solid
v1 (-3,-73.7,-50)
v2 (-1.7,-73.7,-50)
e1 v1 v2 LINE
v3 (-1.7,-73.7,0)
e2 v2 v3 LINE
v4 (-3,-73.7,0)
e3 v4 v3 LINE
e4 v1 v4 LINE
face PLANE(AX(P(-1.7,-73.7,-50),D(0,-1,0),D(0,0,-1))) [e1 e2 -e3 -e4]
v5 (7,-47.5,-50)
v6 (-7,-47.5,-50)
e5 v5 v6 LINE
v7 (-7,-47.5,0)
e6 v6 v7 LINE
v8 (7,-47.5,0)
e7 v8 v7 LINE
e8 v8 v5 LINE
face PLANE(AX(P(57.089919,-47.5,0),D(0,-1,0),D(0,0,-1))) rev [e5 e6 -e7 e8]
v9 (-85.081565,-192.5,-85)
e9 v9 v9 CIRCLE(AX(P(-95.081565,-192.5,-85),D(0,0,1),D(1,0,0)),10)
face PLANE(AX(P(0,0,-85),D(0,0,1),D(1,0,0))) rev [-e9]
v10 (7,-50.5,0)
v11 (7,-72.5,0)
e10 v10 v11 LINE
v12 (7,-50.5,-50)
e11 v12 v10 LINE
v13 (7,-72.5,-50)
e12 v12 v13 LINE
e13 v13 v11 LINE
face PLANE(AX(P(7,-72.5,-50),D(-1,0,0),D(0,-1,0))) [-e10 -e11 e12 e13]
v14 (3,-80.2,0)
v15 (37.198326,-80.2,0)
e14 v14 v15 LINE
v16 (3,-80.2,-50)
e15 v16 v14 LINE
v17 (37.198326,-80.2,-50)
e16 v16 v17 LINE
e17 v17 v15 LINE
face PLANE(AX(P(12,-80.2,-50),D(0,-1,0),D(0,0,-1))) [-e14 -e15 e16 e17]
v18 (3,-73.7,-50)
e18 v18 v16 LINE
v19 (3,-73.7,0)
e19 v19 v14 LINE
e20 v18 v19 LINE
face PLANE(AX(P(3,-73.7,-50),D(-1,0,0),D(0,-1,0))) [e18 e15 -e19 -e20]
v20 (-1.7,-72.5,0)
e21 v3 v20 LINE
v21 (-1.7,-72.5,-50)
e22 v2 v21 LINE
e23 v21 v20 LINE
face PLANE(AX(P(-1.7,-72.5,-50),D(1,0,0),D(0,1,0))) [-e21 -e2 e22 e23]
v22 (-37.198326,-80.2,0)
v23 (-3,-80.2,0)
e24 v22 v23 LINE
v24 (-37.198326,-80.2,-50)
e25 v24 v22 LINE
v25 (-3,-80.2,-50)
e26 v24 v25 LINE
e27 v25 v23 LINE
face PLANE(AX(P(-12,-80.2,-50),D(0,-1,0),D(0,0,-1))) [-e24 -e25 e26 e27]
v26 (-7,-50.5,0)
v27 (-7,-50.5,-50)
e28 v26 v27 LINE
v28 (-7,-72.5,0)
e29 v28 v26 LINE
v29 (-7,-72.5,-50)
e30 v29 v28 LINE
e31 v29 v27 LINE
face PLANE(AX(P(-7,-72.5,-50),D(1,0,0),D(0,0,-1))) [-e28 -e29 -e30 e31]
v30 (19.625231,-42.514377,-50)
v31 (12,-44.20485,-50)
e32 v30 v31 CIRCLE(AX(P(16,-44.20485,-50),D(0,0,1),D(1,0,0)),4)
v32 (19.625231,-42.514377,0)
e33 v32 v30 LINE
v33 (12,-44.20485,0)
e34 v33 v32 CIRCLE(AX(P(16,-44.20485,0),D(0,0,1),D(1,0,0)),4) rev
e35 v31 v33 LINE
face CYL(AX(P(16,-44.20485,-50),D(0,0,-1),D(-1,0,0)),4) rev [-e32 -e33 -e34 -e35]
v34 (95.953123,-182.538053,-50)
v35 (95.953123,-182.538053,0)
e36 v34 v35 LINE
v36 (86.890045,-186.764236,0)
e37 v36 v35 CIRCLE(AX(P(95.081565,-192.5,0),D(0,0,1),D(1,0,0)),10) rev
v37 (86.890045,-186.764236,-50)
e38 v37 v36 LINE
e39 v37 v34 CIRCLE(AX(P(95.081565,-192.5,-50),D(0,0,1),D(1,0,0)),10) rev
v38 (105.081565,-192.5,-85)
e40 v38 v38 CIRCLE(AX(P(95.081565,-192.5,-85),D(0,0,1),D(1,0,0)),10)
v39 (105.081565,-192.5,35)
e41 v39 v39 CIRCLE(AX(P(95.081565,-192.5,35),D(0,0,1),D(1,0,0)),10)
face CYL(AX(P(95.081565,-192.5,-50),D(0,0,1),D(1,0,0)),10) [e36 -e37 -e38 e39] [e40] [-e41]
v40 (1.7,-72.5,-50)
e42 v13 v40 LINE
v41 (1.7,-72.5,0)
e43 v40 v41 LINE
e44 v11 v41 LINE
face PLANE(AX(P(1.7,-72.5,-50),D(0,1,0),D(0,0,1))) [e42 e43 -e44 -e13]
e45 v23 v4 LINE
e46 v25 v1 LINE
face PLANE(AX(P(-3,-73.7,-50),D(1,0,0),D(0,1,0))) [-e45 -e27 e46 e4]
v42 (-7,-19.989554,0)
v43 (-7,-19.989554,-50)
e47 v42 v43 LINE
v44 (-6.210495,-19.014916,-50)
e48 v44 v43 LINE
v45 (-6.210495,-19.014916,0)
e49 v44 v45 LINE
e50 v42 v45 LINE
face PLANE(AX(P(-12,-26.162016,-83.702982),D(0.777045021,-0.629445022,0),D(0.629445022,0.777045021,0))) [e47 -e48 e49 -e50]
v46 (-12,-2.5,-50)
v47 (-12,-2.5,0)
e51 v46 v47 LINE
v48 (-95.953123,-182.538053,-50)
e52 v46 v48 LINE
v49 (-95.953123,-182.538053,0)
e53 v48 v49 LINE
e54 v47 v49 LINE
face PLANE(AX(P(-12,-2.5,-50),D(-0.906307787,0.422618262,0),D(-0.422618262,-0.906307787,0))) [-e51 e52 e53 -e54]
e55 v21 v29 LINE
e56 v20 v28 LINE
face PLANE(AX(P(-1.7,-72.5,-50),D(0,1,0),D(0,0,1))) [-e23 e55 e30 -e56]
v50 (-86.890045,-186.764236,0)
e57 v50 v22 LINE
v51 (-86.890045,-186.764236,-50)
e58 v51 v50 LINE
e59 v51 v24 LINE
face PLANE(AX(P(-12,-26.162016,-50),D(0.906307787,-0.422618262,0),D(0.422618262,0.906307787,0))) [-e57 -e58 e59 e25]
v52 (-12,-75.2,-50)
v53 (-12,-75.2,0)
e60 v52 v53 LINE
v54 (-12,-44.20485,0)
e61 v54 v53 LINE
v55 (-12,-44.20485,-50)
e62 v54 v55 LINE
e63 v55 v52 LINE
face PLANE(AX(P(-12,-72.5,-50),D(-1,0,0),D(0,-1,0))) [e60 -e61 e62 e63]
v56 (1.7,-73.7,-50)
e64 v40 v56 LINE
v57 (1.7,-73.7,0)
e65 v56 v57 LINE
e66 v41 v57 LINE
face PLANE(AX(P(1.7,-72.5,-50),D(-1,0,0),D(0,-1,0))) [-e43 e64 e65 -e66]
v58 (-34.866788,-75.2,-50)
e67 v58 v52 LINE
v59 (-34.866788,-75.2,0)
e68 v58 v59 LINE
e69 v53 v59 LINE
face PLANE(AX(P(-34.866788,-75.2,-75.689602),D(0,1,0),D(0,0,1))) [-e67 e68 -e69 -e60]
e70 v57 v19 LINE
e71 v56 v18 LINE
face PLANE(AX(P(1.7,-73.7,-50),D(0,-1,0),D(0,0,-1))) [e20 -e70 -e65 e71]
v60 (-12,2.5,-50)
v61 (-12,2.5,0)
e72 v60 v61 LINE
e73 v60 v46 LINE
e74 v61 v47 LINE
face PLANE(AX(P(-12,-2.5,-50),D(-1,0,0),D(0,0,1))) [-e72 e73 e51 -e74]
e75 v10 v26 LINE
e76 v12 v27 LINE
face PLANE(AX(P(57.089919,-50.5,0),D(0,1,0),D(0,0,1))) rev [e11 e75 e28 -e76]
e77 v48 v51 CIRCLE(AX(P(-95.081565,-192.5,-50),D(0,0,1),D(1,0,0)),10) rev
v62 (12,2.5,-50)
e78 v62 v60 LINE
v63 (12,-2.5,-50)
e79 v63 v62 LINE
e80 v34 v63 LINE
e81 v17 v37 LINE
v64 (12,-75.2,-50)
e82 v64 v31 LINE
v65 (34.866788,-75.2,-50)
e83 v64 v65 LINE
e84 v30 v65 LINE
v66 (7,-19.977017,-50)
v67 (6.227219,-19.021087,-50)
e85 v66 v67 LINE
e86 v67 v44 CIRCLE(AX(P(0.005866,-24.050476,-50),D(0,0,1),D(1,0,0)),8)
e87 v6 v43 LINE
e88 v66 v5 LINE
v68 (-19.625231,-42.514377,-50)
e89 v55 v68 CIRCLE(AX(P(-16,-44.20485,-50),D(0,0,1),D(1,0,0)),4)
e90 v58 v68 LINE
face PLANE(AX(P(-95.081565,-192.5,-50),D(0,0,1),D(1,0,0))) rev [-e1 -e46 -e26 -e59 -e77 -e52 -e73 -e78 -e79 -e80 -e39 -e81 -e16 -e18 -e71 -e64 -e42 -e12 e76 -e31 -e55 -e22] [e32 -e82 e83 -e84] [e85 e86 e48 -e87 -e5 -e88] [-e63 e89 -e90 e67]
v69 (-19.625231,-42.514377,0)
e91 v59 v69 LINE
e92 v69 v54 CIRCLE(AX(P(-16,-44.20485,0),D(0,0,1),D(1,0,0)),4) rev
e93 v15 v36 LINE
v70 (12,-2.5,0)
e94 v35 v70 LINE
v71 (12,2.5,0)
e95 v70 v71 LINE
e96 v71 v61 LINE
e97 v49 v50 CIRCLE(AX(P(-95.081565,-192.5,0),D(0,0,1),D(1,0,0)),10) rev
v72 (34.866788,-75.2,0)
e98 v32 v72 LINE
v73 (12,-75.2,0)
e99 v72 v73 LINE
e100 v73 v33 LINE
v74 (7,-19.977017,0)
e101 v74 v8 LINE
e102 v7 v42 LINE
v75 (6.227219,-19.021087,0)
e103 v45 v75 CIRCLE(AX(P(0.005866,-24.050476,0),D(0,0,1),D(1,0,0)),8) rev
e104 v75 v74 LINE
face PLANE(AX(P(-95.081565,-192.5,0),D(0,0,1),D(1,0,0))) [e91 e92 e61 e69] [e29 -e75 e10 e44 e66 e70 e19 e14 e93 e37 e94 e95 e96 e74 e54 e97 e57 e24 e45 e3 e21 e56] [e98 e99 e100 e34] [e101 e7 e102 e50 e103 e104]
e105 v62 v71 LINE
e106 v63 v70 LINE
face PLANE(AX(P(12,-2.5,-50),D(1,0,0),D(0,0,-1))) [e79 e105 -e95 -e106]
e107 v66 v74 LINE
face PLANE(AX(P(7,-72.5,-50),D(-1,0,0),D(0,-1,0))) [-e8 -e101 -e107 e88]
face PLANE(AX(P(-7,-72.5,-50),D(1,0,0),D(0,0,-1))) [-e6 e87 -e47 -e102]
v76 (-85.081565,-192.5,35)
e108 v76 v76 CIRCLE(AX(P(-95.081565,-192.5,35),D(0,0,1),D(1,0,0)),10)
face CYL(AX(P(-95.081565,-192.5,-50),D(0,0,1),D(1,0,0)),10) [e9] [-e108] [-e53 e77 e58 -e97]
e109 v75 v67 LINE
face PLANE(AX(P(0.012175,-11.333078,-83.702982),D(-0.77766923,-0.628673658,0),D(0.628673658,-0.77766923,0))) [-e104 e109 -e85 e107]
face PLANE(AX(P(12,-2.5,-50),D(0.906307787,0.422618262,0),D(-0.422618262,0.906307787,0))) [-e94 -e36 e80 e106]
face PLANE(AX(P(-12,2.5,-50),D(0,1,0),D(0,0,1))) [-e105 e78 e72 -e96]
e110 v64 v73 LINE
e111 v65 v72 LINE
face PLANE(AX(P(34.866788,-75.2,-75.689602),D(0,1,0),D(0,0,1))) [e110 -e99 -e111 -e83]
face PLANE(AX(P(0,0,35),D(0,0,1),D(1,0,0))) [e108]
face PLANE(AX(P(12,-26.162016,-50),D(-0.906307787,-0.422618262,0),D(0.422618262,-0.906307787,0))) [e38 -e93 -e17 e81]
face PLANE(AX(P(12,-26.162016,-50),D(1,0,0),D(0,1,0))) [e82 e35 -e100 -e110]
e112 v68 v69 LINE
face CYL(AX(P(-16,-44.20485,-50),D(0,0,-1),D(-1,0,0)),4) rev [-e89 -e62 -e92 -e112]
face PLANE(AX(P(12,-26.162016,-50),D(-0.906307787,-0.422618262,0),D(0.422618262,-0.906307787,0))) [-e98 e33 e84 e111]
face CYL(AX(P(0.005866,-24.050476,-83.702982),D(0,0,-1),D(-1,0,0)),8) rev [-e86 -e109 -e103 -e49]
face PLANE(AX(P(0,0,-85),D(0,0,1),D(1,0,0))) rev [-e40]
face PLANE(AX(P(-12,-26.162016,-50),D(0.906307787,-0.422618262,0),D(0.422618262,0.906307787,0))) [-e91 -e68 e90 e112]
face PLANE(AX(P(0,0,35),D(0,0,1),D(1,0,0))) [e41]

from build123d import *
from build123d.topology import SkipClean

# Parameters (mm, degrees)
BOSS_EXTRUDE1_DEPTH     = 50
BOSS_EXTRUDE3_START     = -85
BOSS_EXTRUDE3_OUTLINE_R = 10
BOSS_EXTRUDE3_DEPTH     = 120
FILLET1_R               = 8
BOSS_EXTRUDE5_DEPTH     = 50
FILLET2_R               = 8
FILLET3_R               = 4
BOSS_EXTRUDE6_DEPTH     = 50
SKETCH7_W               = 50
SKETCH7_H               = 3
BOSS_EXTRUDE7_DEPTH     = 14


with BuildPart() as part:
    # Sketch1 → Boss-Extrude1 (new body)
    with BuildSketch(Plane.XY):
        with BuildLine():
            Line((-12, -26.162016), (-12, -72.5))
            Line((-12, -72.5), (-12, -80.2))
            Line((-12, -80.2), (-3, -80.2))
            Line((-3, -80.2), (-3, -73.7))
            Line((-3, -73.7), (-1.7, -73.7))
            Line((-1.7, -73.7), (-1.7, -72.5))
            Line((-1.7, -72.5), (-7, -72.5))
            Line((-7, -72.5), (-7, -15.439481))
            Line((-7, -15.439481), (0, -0.427933))
            Line((0, -0.427933), (7, -15.439481))
            Line((7, -15.439481), (7, -72.5))
            Line((7, -72.5), (1.7, -72.5))
            Line((1.7, -72.5), (1.7, -73.7))
            Line((1.7, -73.7), (3, -73.7))
            Line((3, -73.7), (3, -80.2))
            Line((3, -80.2), (12, -80.2))
            Line((12, -80.2), (12, -72.5))
            Line((12, -72.5), (12, -26.162016))
            Line((12, -26.162016), (86.890045, -186.764236))
            ThreePointArc((86.890045, -186.764236), (99.307748, -201.563078), (95.953123, -182.538053))
            Line((95.953123, -182.538053), (12, -2.5))
            Line((12, -2.5), (12, 2.5))
            Line((12, 2.5), (-12, 2.5))
            Line((-12, 2.5), (-12, -2.5))
            Line((-12, -2.5), (-95.953123, -182.538053))
            ThreePointArc((-95.953123, -182.538053), (-99.307748, -201.563078), (-86.890045, -186.764236))
            Line((-86.890045, -186.764236), (-12, -26.162016))
        make_face()
    extrude(amount=-BOSS_EXTRUDE1_DEPTH)

    # Boss-Extrude3: read off the stored shape, not the designer's step
    # Boss-Extrude3 outline → Boss-Extrude3 (add)
    with SkipClean():  # the faces are left unmerged after this step: merging them gives an invalid solid
        with BuildSketch(Plane.XY.offset(BOSS_EXTRUDE3_START)):
            with Locations((-95.081565, -192.5)):
                Circle(BOSS_EXTRUDE3_OUTLINE_R)
            with Locations((95.081565, -192.5)):
                Circle(BOSS_EXTRUDE3_OUTLINE_R)
        extrude(amount=BOSS_EXTRUDE3_DEPTH)

    # Fillet1
    # the kernel refuses this fillet: 8 mm, written as the material it adds along each edge
    with BuildSketch(Plane(origin=(0, -0.427933, 0), x_dir=(0.42261826174070033, -0.9063077870366496, 0), z_dir=(0, 0, -1))) as fillet1_piece_1:
        with BuildLine():
            CenterArc((17.12902, 8), FILLET1_R, 144.123602, 125.876398)
            Line((10.646755, 12.688309), (10.51711, 12.782075))
            ThreePointArc((10.51711, 12.782075), (5.200811, 6.447001), (-0.122567, 0.102846))
            Line((-0.122567, 0.102846), (0, -0.16))
            Line((0, -0.16), (17.12902, -0.16))
            Line((17.12902, -0.16), (17.12902, 0))
        make_face()
    extrude(amount=50)

    # Sketch5 → Boss-Extrude5 (add)
    with BuildSketch(Plane.XY):
        Polygon((-12, -26.162016), (0.012175, -11.333078), (12, -26.162016), (12, -2.5), (-12, -2.5), align=None)
    extrude(amount=-BOSS_EXTRUDE5_DEPTH)

    # Fillet2
    fillet2_edges = [part.edges().sort_by_distance(p)[0] for p in [
        (0.012175, -11.333078, -25),
    ]]
    fillet(fillet2_edges, radius=FILLET2_R)

    # Fillet3
    fillet3_edges = [part.edges().sort_by_distance(p)[0] for p in [
        (-12, -26.162016, -25),
        (12, -26.162016, -25),
    ]]
    fillet(fillet3_edges, radius=FILLET3_R)

    # Sketch6 → Boss-Extrude6 (add)
    with BuildSketch(Plane.XY):
        Polygon((-12, -80.2), (-37.198326, -80.2), (-34.866788, -75.2), (-12, -75.2), align=None)
        Polygon((12, -75.2), (12, -80.2), (37.198326, -80.2), (34.866788, -75.2), align=None)
    extrude(amount=-BOSS_EXTRUDE6_DEPTH)

    # Sketch7 → Boss-Extrude7 (add)
    with BuildSketch(Plane(origin=(-7, 0, 0), x_dir=(0, 0, -1), z_dir=(1, 0, 0))):
        with Locations((25, -49)):
            Rectangle(SKETCH7_W, SKETCH7_H)
    extrude(amount=BOSS_EXTRUDE7_DEPTH)


solid = part.part
